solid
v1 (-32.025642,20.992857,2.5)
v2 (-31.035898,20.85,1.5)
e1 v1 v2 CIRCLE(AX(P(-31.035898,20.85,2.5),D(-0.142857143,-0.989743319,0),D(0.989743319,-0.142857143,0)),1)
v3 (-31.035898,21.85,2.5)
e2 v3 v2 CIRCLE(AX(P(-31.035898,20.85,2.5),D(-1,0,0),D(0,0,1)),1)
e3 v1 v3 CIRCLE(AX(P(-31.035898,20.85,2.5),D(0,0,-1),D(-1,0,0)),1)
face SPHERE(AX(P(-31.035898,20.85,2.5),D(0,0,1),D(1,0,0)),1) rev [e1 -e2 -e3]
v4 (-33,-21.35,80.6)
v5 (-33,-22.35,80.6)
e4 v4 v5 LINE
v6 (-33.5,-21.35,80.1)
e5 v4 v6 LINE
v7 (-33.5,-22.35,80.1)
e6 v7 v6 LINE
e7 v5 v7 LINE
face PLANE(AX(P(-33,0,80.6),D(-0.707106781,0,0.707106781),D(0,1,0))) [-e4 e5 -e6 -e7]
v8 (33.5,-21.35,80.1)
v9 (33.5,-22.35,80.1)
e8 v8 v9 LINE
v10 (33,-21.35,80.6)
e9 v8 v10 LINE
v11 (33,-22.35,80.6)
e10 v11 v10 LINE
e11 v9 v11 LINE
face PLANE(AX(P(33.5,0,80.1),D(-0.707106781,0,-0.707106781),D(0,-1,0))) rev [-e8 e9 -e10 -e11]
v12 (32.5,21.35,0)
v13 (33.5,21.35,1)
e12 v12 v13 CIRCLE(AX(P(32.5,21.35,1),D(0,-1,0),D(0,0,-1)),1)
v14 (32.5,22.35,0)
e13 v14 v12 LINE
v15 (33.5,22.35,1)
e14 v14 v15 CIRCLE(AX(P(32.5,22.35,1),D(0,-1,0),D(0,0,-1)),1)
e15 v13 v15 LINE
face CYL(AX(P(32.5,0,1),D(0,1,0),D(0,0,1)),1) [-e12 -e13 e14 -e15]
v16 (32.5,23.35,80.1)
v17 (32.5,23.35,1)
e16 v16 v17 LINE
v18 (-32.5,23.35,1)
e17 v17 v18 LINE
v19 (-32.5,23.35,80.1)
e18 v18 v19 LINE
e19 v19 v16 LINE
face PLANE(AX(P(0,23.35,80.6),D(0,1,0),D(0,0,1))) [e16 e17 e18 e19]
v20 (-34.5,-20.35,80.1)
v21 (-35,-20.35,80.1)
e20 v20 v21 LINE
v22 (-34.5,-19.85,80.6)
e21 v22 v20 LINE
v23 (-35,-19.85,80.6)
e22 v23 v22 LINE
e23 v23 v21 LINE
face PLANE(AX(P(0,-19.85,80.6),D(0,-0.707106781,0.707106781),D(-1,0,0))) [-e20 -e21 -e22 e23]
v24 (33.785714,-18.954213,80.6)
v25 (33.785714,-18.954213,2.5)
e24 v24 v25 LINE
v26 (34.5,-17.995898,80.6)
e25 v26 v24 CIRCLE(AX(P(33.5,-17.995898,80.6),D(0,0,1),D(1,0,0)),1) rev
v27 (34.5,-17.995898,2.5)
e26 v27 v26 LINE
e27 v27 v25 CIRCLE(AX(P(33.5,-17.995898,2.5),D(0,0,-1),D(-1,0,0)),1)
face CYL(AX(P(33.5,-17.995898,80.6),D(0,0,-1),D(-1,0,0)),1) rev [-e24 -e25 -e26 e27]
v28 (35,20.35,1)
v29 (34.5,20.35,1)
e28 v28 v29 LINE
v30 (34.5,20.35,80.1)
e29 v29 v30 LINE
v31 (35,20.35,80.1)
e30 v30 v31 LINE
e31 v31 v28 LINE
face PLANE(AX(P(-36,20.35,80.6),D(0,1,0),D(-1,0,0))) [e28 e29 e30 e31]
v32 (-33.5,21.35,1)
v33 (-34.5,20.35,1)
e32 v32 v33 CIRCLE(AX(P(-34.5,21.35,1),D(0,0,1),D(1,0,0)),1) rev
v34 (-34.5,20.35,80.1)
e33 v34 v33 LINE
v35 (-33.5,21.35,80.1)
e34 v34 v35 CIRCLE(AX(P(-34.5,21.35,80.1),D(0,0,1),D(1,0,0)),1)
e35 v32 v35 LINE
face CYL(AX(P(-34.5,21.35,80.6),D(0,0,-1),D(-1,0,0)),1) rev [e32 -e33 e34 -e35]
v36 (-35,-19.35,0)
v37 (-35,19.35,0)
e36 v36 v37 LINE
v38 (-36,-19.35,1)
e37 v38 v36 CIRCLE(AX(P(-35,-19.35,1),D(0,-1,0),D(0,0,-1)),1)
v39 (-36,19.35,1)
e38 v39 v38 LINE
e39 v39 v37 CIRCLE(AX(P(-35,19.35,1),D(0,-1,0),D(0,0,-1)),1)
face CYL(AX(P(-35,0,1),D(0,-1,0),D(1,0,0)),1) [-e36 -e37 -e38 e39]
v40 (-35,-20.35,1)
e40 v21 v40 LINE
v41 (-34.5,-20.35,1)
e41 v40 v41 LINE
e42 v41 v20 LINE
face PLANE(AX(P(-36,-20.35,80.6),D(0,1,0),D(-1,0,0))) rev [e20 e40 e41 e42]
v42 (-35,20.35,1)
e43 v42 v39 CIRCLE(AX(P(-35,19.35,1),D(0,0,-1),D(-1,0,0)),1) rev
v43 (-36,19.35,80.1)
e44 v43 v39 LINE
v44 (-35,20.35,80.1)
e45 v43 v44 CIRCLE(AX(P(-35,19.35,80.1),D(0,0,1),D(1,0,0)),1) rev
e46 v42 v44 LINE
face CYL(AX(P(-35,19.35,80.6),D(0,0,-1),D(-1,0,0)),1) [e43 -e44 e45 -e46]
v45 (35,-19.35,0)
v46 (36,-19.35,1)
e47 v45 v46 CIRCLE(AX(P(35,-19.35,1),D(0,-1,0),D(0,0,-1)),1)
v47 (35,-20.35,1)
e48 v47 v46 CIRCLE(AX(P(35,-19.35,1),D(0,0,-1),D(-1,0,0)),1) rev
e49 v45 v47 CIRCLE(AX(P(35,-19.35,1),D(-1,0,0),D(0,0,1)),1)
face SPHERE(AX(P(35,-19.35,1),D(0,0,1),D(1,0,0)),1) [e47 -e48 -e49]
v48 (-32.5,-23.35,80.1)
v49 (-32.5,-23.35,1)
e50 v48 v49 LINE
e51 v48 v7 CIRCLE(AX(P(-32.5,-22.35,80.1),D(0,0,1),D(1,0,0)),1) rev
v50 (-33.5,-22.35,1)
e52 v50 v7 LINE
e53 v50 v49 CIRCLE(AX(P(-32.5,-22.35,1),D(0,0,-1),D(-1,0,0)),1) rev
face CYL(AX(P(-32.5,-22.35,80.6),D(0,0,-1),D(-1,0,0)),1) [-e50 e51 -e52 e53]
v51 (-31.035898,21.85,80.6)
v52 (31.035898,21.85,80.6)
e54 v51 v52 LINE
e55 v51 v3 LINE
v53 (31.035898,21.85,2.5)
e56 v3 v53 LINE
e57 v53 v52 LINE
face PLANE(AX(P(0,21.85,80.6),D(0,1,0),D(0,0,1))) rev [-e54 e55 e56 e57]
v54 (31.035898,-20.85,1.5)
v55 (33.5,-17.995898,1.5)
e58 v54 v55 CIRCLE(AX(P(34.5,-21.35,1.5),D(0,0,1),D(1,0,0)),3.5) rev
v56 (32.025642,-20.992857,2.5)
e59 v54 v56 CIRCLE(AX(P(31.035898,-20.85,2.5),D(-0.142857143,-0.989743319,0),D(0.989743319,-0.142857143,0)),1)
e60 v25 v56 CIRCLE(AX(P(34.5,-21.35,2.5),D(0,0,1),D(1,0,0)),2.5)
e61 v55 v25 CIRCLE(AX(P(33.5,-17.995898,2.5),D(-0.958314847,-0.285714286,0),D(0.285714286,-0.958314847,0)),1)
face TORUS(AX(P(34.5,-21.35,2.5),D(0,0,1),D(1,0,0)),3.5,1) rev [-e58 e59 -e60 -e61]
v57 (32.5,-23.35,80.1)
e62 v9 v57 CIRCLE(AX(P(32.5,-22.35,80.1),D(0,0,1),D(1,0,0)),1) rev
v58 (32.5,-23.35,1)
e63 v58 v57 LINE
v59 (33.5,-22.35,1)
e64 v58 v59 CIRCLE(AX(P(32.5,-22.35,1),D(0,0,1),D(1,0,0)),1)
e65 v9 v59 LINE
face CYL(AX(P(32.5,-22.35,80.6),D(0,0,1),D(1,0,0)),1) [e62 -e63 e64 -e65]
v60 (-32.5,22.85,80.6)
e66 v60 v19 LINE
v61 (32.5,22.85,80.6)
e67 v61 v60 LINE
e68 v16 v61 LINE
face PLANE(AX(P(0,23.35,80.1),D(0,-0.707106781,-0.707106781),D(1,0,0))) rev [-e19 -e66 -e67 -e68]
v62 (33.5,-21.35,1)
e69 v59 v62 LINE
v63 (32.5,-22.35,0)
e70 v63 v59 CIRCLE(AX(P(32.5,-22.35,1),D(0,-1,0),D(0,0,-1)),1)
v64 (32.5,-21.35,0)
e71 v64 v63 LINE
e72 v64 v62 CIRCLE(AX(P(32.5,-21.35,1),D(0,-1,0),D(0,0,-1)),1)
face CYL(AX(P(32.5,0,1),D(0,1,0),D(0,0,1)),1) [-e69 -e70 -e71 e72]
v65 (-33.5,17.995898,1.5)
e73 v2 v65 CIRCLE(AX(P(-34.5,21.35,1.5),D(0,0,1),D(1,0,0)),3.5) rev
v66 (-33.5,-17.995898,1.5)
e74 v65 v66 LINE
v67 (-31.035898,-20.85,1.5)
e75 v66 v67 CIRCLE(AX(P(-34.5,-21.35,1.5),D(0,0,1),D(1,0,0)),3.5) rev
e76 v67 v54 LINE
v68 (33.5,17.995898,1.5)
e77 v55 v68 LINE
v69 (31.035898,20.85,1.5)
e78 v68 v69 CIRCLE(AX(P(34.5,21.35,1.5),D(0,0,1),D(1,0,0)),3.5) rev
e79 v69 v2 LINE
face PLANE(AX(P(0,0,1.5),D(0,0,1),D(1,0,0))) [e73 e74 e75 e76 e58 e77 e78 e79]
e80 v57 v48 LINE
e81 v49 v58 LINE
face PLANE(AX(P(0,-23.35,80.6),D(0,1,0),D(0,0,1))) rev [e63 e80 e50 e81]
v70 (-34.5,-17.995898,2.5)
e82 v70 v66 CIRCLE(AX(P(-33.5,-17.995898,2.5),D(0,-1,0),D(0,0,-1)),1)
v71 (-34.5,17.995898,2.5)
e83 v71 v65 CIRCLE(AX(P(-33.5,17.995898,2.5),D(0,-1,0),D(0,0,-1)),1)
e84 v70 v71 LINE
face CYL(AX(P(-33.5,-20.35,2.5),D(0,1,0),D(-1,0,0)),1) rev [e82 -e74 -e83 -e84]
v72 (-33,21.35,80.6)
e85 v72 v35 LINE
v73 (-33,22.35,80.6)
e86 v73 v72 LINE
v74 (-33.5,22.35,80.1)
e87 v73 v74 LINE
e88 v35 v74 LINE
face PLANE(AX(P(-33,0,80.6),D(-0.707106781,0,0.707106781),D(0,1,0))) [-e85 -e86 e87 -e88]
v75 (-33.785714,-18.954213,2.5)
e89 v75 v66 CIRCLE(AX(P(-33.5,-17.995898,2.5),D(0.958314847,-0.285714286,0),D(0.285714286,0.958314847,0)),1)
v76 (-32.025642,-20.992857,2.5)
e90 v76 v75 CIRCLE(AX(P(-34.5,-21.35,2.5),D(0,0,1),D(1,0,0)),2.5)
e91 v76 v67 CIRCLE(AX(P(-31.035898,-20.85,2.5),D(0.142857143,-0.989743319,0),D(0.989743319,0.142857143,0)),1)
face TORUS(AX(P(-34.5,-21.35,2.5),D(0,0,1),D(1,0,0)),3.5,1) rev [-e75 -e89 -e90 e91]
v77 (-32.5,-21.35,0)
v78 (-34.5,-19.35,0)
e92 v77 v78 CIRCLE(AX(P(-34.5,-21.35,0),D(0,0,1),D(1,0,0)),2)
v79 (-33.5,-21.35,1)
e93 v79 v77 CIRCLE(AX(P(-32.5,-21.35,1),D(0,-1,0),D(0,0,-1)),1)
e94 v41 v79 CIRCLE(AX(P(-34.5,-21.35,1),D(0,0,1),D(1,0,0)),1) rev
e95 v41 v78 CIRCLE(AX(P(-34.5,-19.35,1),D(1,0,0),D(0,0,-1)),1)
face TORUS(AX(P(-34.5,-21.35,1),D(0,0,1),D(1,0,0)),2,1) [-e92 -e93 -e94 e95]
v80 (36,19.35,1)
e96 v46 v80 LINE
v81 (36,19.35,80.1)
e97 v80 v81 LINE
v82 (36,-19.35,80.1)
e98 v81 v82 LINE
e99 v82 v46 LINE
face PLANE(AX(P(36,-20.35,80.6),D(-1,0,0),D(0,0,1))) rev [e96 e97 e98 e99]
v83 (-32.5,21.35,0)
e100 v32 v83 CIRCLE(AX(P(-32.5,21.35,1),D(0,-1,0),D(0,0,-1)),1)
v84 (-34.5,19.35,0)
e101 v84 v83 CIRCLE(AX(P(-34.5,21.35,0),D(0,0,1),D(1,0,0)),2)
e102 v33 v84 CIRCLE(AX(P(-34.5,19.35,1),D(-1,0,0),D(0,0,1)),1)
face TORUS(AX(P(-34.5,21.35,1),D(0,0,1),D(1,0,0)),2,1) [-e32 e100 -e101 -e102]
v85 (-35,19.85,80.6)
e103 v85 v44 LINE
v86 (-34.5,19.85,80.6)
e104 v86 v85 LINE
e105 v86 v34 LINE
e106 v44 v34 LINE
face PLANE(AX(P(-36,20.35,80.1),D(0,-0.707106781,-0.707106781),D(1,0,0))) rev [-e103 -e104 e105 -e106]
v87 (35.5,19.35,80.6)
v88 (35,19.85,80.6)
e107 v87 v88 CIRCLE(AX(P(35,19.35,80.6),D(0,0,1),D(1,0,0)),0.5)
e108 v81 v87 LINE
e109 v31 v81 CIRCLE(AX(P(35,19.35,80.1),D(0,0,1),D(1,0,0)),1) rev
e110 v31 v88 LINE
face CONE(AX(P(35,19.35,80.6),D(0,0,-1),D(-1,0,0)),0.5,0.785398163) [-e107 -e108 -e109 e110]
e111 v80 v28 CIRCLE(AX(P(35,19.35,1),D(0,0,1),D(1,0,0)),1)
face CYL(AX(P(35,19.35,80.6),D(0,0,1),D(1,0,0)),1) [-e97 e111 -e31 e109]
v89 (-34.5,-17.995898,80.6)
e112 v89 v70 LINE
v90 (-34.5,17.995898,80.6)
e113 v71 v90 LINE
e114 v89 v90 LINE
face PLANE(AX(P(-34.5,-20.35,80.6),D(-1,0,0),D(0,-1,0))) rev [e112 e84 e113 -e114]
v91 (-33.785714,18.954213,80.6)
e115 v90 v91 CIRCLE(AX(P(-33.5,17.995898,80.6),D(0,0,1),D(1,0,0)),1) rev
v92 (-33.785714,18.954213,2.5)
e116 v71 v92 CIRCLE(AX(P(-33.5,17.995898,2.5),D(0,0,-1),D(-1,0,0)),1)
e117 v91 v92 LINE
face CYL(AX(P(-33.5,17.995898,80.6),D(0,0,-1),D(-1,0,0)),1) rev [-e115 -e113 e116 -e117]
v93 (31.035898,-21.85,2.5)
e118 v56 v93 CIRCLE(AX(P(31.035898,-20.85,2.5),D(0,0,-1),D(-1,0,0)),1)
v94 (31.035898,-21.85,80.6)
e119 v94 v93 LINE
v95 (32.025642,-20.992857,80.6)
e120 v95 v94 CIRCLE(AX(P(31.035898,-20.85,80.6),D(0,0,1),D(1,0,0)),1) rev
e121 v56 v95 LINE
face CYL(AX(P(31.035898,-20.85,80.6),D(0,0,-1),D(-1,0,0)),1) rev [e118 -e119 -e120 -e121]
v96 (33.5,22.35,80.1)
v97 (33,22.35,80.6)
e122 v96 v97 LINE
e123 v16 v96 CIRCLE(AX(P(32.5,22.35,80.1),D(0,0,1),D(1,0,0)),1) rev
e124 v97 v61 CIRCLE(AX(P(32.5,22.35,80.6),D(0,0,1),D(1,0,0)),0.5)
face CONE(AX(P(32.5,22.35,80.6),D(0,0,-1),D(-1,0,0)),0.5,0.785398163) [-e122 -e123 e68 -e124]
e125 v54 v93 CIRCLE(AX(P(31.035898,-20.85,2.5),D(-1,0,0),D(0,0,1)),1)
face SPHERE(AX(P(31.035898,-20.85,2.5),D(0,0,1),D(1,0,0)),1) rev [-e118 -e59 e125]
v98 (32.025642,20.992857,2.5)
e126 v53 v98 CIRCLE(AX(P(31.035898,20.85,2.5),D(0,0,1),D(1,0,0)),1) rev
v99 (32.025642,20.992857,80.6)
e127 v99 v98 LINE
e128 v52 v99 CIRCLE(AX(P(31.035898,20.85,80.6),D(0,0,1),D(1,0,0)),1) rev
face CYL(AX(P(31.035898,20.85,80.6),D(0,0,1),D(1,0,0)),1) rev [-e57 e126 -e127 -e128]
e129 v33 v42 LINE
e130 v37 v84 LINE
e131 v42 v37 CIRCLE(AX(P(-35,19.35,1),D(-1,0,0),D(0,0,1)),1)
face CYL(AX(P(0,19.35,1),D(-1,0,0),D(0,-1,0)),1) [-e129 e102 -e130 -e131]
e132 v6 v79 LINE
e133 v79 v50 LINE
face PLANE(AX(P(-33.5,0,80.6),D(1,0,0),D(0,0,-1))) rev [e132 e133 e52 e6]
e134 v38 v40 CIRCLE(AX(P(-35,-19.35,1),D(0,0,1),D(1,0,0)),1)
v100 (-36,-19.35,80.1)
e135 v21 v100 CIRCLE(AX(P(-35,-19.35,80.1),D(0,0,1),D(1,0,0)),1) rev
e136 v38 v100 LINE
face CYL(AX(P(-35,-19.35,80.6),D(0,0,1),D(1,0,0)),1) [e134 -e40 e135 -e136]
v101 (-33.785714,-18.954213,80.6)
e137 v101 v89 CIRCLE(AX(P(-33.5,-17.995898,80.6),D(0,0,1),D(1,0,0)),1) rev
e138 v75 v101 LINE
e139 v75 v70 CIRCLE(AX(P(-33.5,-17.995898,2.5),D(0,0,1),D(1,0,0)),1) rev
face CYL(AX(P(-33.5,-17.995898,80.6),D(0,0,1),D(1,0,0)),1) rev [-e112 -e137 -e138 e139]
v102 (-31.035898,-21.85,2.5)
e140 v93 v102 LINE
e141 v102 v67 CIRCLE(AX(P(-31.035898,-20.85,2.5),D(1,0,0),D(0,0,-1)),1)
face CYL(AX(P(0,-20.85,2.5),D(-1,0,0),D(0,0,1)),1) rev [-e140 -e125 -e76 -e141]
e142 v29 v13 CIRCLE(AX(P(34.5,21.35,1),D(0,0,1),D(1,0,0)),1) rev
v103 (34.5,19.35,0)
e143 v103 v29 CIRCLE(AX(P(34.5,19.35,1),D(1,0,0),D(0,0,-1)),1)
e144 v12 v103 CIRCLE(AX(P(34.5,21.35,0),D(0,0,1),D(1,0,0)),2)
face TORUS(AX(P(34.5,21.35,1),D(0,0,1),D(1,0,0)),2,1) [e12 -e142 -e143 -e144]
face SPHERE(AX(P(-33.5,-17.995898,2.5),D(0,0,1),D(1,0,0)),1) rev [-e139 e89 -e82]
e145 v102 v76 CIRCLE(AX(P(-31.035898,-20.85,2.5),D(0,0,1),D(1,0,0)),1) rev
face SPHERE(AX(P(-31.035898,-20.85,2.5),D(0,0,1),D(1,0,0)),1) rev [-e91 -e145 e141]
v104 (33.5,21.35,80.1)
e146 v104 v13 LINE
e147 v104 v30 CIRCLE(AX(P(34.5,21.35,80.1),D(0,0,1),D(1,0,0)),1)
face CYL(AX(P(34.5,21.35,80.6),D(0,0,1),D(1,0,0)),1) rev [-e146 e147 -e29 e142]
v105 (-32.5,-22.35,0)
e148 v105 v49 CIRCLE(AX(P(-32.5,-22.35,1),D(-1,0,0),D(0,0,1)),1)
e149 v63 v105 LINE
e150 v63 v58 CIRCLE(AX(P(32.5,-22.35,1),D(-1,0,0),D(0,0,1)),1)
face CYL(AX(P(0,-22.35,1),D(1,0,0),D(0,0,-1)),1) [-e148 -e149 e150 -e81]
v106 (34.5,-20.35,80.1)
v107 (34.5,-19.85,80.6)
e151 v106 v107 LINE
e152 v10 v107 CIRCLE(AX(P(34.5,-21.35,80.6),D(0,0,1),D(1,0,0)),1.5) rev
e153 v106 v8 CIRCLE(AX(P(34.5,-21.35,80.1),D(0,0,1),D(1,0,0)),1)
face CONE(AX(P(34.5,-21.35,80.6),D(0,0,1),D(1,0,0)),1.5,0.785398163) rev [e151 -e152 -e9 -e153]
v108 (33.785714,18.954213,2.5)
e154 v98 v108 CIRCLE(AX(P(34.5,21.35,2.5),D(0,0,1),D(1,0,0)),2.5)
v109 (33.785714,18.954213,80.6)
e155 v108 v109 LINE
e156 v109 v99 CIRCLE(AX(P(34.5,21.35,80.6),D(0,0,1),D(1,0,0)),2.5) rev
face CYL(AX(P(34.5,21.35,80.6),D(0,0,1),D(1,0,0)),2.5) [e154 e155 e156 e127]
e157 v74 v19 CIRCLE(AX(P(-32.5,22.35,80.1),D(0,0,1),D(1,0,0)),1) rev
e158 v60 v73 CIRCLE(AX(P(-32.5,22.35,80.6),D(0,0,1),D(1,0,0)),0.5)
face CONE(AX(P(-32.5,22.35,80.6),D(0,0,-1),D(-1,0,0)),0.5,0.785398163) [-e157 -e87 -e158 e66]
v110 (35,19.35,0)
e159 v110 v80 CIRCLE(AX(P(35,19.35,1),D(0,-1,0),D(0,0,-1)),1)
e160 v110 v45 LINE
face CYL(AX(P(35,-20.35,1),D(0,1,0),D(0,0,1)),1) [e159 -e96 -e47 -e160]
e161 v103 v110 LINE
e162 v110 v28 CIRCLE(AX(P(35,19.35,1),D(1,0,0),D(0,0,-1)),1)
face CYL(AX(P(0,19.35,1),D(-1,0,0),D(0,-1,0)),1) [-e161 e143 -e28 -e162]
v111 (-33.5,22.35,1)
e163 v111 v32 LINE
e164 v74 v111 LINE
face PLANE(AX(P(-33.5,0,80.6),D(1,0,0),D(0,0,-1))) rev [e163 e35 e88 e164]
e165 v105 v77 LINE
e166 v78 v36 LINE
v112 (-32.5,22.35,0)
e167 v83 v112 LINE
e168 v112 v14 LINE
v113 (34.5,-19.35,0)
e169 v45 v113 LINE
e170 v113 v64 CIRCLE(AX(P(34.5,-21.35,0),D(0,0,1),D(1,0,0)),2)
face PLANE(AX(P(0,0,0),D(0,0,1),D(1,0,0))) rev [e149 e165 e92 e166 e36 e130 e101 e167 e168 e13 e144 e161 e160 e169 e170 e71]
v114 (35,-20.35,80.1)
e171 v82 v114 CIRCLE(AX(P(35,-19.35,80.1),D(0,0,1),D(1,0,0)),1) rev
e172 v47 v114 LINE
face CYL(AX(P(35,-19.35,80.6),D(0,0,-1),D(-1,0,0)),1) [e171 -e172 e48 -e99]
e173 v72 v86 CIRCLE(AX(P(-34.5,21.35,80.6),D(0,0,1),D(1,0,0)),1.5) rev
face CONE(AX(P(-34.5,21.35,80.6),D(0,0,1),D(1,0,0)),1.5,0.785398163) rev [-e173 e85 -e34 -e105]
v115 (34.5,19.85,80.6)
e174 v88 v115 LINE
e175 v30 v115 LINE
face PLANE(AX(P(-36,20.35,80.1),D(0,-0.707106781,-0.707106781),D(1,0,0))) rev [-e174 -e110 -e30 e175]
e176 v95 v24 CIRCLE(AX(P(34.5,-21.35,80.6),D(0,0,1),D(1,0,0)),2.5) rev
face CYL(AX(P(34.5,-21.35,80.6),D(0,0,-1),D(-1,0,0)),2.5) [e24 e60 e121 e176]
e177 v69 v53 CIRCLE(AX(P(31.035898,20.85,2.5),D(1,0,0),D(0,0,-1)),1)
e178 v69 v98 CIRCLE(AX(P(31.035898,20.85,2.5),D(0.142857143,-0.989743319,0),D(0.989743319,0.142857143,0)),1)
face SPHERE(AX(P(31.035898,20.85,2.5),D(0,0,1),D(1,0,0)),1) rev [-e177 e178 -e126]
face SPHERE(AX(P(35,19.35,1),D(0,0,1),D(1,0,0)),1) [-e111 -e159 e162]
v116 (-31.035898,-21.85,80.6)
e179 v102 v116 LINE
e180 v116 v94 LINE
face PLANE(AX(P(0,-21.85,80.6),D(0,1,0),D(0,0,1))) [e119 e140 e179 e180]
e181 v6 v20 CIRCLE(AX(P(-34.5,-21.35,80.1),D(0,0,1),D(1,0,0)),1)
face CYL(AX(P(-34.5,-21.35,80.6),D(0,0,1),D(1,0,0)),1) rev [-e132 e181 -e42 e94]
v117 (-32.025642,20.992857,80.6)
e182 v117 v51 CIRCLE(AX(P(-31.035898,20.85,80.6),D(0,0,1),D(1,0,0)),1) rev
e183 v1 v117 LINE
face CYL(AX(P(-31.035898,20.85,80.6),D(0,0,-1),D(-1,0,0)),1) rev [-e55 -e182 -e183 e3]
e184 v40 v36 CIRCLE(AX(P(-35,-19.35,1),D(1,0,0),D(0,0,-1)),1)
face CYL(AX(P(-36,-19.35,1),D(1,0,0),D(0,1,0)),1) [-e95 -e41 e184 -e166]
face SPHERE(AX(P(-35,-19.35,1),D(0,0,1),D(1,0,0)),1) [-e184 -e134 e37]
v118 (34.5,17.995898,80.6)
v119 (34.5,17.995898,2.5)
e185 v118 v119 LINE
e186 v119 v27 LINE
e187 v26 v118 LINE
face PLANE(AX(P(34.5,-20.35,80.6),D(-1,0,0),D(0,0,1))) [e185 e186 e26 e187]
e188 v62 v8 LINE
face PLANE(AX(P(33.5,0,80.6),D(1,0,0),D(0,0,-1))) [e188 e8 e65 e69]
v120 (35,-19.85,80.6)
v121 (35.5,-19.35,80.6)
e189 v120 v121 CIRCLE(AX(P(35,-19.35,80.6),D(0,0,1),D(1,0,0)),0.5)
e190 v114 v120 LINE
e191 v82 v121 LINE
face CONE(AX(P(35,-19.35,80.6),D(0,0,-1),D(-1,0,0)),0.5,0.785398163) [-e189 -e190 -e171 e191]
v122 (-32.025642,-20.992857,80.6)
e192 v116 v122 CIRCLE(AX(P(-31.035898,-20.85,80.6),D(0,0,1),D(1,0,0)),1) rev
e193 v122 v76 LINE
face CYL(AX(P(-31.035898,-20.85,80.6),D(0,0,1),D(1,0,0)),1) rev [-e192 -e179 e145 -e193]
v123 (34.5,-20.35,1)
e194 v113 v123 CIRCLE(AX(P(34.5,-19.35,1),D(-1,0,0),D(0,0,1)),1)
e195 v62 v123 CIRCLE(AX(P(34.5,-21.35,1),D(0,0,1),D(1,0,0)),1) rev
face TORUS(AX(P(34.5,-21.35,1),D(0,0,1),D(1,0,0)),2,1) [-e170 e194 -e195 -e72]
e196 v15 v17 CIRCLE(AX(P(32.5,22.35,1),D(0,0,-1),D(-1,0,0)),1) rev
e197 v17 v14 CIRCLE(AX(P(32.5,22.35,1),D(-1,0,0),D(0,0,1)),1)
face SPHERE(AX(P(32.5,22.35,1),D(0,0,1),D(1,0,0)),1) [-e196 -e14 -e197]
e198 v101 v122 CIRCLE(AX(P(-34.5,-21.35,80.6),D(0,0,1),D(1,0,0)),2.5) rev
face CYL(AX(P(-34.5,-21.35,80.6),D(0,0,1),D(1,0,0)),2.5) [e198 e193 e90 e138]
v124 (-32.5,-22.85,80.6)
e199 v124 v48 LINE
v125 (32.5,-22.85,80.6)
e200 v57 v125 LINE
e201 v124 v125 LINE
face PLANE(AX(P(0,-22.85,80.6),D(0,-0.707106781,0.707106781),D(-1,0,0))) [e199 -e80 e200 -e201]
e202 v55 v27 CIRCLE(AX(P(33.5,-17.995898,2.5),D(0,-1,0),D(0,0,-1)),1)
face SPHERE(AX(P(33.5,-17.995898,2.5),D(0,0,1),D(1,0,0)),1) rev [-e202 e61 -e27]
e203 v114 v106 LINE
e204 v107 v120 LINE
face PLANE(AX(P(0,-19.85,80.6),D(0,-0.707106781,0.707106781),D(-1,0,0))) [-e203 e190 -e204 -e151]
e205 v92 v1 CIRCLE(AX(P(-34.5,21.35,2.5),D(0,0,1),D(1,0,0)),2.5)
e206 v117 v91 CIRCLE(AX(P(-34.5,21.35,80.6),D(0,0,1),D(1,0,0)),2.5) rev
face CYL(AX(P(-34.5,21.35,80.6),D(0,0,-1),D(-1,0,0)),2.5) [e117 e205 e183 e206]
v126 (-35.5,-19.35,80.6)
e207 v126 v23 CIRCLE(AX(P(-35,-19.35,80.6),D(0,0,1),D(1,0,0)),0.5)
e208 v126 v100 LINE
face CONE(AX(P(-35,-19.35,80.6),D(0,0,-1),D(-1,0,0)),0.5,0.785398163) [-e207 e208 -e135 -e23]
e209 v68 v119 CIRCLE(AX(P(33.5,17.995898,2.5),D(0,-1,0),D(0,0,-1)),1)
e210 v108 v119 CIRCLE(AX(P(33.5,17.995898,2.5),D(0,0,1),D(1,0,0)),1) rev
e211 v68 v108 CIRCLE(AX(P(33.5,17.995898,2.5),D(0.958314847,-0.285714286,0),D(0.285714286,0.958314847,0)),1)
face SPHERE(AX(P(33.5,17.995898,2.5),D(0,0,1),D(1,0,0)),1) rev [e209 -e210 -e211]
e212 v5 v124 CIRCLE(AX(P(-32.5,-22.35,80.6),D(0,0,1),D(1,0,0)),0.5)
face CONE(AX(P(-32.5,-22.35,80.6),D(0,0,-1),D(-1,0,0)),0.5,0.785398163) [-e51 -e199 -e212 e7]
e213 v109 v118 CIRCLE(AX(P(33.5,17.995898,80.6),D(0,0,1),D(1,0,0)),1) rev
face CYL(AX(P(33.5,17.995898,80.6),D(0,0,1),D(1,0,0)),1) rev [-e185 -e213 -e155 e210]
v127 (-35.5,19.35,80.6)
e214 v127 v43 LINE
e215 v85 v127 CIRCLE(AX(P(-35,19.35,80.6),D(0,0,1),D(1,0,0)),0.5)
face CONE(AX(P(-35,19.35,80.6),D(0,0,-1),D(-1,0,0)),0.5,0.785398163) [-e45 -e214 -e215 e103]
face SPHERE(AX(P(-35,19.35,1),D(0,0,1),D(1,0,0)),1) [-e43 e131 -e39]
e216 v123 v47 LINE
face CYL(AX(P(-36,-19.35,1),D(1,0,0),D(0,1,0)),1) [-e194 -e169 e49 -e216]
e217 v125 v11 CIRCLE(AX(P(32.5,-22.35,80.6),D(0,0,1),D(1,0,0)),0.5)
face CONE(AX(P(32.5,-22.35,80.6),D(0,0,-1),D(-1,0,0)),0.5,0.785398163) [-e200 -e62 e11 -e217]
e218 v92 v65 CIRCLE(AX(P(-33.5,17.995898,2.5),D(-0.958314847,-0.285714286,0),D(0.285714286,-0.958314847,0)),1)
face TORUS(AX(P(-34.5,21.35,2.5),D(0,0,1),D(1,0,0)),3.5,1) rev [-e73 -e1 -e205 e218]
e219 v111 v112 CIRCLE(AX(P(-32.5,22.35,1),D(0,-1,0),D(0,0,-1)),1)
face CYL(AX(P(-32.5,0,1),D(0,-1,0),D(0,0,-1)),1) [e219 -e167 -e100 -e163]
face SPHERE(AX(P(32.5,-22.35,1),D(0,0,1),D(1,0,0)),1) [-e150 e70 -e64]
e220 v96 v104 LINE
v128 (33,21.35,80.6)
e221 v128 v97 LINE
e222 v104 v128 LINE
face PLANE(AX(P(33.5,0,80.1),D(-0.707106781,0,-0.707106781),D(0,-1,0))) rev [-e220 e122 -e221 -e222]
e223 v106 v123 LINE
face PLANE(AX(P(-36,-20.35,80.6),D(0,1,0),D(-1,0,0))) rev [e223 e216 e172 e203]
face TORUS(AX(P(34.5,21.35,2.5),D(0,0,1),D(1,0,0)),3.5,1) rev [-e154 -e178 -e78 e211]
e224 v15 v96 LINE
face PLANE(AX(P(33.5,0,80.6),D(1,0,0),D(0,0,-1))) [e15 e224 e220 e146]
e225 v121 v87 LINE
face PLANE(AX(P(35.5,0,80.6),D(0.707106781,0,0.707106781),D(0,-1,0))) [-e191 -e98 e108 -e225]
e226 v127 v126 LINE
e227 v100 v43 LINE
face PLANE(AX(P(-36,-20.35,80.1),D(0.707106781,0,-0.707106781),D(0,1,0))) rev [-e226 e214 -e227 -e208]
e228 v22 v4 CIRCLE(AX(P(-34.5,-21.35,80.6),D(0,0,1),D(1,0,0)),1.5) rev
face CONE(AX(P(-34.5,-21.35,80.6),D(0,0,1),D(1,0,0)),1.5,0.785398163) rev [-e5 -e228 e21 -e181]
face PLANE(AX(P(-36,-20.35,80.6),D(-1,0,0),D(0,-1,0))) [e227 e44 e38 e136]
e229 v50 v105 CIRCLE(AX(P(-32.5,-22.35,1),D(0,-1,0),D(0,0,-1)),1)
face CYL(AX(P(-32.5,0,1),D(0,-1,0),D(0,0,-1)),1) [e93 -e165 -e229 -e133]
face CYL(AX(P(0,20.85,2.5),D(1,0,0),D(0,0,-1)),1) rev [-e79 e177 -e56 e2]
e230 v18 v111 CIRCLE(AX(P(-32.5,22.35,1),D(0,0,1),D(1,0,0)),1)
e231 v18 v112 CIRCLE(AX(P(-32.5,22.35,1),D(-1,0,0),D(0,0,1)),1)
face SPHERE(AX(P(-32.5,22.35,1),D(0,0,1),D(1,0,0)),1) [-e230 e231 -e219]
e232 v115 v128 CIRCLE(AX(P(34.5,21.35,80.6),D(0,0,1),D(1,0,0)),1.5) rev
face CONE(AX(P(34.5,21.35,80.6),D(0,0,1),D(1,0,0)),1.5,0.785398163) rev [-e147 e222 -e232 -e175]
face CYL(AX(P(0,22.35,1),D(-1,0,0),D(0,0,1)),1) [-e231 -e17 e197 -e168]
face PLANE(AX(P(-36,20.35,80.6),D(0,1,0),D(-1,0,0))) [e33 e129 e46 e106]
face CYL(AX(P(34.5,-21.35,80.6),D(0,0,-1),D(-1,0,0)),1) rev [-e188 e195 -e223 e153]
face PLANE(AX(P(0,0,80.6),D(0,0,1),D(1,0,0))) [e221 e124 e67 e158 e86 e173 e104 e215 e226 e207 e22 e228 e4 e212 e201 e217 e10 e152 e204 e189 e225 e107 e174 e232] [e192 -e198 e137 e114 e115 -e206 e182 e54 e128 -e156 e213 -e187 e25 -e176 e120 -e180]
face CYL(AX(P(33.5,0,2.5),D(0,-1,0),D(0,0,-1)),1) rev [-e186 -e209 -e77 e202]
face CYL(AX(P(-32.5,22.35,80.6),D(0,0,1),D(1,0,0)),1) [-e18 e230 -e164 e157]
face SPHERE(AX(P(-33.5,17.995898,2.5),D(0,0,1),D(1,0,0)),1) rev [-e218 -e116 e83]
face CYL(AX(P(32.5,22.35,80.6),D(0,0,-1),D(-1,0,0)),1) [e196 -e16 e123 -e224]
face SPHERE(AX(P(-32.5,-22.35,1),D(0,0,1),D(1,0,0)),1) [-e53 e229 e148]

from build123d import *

# Parameters (mm, degrees)
SKETCH_1_W      = 72
SKETCH_1_H      = 40.7
SKETCH_1_W_2    = 67
SKETCH_1_H_2    = 46.7
EXTRUDE_2_DEPTH = 80.6
FILLET_3_R      = 1
SHELL_START     = 1.5
SHELL_2_DEPTH   = 79.1
FILLET_4_R      = 1
FILLET_5_R      = 1
CHAMFER_1_SIZE  = 0.5
FILLET_6_R      = 1


# Read off the part's stored shape, not the designer's step: 抽壳2
with BuildPart() as part:
    # 草图1 → 凸台-拉伸2 (new body)
    with BuildSketch(Plane.XY):
        Rectangle(SKETCH_1_W, SKETCH_1_H)
        Rectangle(SKETCH_1_W_2, SKETCH_1_H_2)
    extrude(amount=EXTRUDE_2_DEPTH)

    # 圆角3
    fillet_3_edges = [part.edges().sort_by_distance(p)[0] for p in [
        (33.5, -20.35, 40.3),
        (-33.5, -20.35, 40.3),
        (-33.5, -23.35, 40.3),
        (33.5, -23.35, 40.3),
        (-36, -20.35, 40.3),
        (36, -20.35, 40.3),
        (36, 20.35, 40.3),
        (-36, 20.35, 40.3),
        (33.5, 20.35, 40.3),
        (-33.5, 20.35, 40.3),
        (-33.5, 23.35, 40.3),
        (33.5, 23.35, 40.3),
    ]]
    fillet(fillet_3_edges, radius=FILLET_3_R)

    # 抽壳2 outline → 抽壳2 (cut)
    with BuildSketch(Plane.XY.offset(SHELL_START)):
        with BuildLine():
            ThreePointArc((34.5, 18.85), (32.732233047, 19.582233047), (32, 21.35))
            Line((32, 21.35), (32, 21.85))
            Line((32, 21.85), (-32, 21.85))
            Line((-32, 21.85), (-32, 21.35))
            ThreePointArc((-32, 21.35), (-32.732233047, 19.582233047), (-34.5, 18.85))
            Line((-34.5, 18.85), (-34.5, -18.85))
            ThreePointArc((-34.5, -18.85), (-32.732233047, -19.582233047), (-32, -21.35))
            Line((-32, -21.35), (-32, -21.85))
            Line((-32, -21.85), (32, -21.85))
            Line((32, -21.85), (32, -21.35))
            ThreePointArc((32, -21.35), (32.732233047, -19.582233047), (34.5, -18.85))
            Line((34.5, -18.85), (34.5, 18.85))
        make_face()
    extrude(amount=SHELL_2_DEPTH, mode=Mode.SUBTRACT)

    # 圆角4
    fillet_4_edges = [part.edges().sort_by_distance(p)[0] for p in [
        (33.5, 21.85, 0),
        (34.75, 20.35, 0),
        (36, 0, 0),
        (34.75, -20.35, 0),
        (33.5, -21.85, 0),
        (0, -23.35, 0),
        (-33.5, -21.85, 0),
        (-34.75, -20.35, 0),
        (-36, 0, 0),
        (-34.75, 20.35, 0),
        (-33.5, 21.85, 0),
        (0, 23.35, 0),
        (35.707106781, -20.057106781, 0),
        (33.207106781, 23.057106781, 0),
        (-33.207106781, 23.057106781, 0),
        (-35.707106781, 20.057106781, 0),
        (-35.707106781, -20.057106781, 0),
        (-33.207106781, -23.057106781, 0),
        (33.207106781, -23.057106781, 0),
        (35.707106781, 20.057106781, 0),
        (33.792893219, 20.642893219, 0),
        (33.792893219, -20.642893219, 0),
        (-33.792893219, -20.642893219, 0),
        (-33.792893219, 20.642893219, 0),
    ]]
    fillet(fillet_4_edges, radius=FILLET_4_R)

    # 圆角5
    fillet_5_edges = [part.edges().sort_by_distance(p)[0] for p in [
        (34.5, 18.85, 41.05),
        (32, 21.85, 41.05),
        (32, 21.35, 41.05),
        (32, -21.85, 41.05),
        (32, -21.35, 41.05),
        (-32, 21.85, 41.05),
        (-32, 21.35, 41.05),
        (-32, -21.35, 41.05),
        (-32, -21.85, 41.05),
        (-34.5, 18.85, 41.05),
        (34.5, -18.85, 41.05),
        (-34.5, -18.85, 41.05),
    ]]
    fillet(fillet_5_edges, radius=FILLET_5_R)

    # 倒角1
    chamfer_1_edges = [part.edges().sort_by_distance(p)[0] for p in [
        (33.5, 21.85, 80.6),
        (34.75, 20.35, 80.6),
        (36, 0, 80.6),
        (0, 23.35, 80.6),
        (-33.5, 21.85, 80.6),
        (-34.75, 20.35, 80.6),
        (-36, 0, 80.6),
        (-34.75, -20.35, 80.6),
        (-33.5, -21.85, 80.6),
        (0, -23.35, 80.6),
        (33.5, -21.85, 80.6),
        (34.75, -20.35, 80.6),
        (35.707106781, -20.057106781, 80.6),
        (33.207106781, 23.057106781, 80.6),
        (-33.207106781, 23.057106781, 80.6),
        (-35.707106781, 20.057106781, 80.6),
        (-35.707106781, -20.057106781, 80.6),
        (-33.207106781, -23.057106781, 80.6),
        (33.207106781, -23.057106781, 80.6),
        (35.707106781, 20.057106781, 80.6),
        (33.792893219, 20.642893219, 80.6),
        (33.792893219, -20.642893219, 80.6),
        (-33.792893219, -20.642893219, 80.6),
        (-33.792893219, 20.642893219, 80.6),
    ]]
    chamfer(chamfer_1_edges, length=CHAMFER_1_SIZE)

    # 圆角6
    fillet_6_edges = [part.edges().sort_by_distance(p)[0] for p in [
        (32.607678605, 19.716255915, 1.5),
        (34.5, 0, 1.5),
        (0, 21.85, 1.5),
        (-32.607678605, 19.716255915, 1.5),
        (-34.5, 0, 1.5),
        (-32.607678605, -19.716255915, 1.5),
        (0, -21.85, 1.5),
        (32.607678605, -19.716255915, 1.5),
        (-34.301783726, -18.593512338, 1.5),
        (34.301783726, -18.593512338, 1.5),
        (31.690552056, -21.605928946, 1.5),
        (-31.690552056, -21.605928946, 1.5),
        (-34.301783726, 18.593512338, 1.5),
        (-31.690552056, 21.605928946, 1.5),
        (31.690552056, 21.605928946, 1.5),
        (34.301783726, 18.593512338, 1.5),
    ]]
    fillet(fillet_6_edges, radius=FILLET_6_R - 0.0001)  # a hair under: the kernel refuses the full size


solid = part.part
